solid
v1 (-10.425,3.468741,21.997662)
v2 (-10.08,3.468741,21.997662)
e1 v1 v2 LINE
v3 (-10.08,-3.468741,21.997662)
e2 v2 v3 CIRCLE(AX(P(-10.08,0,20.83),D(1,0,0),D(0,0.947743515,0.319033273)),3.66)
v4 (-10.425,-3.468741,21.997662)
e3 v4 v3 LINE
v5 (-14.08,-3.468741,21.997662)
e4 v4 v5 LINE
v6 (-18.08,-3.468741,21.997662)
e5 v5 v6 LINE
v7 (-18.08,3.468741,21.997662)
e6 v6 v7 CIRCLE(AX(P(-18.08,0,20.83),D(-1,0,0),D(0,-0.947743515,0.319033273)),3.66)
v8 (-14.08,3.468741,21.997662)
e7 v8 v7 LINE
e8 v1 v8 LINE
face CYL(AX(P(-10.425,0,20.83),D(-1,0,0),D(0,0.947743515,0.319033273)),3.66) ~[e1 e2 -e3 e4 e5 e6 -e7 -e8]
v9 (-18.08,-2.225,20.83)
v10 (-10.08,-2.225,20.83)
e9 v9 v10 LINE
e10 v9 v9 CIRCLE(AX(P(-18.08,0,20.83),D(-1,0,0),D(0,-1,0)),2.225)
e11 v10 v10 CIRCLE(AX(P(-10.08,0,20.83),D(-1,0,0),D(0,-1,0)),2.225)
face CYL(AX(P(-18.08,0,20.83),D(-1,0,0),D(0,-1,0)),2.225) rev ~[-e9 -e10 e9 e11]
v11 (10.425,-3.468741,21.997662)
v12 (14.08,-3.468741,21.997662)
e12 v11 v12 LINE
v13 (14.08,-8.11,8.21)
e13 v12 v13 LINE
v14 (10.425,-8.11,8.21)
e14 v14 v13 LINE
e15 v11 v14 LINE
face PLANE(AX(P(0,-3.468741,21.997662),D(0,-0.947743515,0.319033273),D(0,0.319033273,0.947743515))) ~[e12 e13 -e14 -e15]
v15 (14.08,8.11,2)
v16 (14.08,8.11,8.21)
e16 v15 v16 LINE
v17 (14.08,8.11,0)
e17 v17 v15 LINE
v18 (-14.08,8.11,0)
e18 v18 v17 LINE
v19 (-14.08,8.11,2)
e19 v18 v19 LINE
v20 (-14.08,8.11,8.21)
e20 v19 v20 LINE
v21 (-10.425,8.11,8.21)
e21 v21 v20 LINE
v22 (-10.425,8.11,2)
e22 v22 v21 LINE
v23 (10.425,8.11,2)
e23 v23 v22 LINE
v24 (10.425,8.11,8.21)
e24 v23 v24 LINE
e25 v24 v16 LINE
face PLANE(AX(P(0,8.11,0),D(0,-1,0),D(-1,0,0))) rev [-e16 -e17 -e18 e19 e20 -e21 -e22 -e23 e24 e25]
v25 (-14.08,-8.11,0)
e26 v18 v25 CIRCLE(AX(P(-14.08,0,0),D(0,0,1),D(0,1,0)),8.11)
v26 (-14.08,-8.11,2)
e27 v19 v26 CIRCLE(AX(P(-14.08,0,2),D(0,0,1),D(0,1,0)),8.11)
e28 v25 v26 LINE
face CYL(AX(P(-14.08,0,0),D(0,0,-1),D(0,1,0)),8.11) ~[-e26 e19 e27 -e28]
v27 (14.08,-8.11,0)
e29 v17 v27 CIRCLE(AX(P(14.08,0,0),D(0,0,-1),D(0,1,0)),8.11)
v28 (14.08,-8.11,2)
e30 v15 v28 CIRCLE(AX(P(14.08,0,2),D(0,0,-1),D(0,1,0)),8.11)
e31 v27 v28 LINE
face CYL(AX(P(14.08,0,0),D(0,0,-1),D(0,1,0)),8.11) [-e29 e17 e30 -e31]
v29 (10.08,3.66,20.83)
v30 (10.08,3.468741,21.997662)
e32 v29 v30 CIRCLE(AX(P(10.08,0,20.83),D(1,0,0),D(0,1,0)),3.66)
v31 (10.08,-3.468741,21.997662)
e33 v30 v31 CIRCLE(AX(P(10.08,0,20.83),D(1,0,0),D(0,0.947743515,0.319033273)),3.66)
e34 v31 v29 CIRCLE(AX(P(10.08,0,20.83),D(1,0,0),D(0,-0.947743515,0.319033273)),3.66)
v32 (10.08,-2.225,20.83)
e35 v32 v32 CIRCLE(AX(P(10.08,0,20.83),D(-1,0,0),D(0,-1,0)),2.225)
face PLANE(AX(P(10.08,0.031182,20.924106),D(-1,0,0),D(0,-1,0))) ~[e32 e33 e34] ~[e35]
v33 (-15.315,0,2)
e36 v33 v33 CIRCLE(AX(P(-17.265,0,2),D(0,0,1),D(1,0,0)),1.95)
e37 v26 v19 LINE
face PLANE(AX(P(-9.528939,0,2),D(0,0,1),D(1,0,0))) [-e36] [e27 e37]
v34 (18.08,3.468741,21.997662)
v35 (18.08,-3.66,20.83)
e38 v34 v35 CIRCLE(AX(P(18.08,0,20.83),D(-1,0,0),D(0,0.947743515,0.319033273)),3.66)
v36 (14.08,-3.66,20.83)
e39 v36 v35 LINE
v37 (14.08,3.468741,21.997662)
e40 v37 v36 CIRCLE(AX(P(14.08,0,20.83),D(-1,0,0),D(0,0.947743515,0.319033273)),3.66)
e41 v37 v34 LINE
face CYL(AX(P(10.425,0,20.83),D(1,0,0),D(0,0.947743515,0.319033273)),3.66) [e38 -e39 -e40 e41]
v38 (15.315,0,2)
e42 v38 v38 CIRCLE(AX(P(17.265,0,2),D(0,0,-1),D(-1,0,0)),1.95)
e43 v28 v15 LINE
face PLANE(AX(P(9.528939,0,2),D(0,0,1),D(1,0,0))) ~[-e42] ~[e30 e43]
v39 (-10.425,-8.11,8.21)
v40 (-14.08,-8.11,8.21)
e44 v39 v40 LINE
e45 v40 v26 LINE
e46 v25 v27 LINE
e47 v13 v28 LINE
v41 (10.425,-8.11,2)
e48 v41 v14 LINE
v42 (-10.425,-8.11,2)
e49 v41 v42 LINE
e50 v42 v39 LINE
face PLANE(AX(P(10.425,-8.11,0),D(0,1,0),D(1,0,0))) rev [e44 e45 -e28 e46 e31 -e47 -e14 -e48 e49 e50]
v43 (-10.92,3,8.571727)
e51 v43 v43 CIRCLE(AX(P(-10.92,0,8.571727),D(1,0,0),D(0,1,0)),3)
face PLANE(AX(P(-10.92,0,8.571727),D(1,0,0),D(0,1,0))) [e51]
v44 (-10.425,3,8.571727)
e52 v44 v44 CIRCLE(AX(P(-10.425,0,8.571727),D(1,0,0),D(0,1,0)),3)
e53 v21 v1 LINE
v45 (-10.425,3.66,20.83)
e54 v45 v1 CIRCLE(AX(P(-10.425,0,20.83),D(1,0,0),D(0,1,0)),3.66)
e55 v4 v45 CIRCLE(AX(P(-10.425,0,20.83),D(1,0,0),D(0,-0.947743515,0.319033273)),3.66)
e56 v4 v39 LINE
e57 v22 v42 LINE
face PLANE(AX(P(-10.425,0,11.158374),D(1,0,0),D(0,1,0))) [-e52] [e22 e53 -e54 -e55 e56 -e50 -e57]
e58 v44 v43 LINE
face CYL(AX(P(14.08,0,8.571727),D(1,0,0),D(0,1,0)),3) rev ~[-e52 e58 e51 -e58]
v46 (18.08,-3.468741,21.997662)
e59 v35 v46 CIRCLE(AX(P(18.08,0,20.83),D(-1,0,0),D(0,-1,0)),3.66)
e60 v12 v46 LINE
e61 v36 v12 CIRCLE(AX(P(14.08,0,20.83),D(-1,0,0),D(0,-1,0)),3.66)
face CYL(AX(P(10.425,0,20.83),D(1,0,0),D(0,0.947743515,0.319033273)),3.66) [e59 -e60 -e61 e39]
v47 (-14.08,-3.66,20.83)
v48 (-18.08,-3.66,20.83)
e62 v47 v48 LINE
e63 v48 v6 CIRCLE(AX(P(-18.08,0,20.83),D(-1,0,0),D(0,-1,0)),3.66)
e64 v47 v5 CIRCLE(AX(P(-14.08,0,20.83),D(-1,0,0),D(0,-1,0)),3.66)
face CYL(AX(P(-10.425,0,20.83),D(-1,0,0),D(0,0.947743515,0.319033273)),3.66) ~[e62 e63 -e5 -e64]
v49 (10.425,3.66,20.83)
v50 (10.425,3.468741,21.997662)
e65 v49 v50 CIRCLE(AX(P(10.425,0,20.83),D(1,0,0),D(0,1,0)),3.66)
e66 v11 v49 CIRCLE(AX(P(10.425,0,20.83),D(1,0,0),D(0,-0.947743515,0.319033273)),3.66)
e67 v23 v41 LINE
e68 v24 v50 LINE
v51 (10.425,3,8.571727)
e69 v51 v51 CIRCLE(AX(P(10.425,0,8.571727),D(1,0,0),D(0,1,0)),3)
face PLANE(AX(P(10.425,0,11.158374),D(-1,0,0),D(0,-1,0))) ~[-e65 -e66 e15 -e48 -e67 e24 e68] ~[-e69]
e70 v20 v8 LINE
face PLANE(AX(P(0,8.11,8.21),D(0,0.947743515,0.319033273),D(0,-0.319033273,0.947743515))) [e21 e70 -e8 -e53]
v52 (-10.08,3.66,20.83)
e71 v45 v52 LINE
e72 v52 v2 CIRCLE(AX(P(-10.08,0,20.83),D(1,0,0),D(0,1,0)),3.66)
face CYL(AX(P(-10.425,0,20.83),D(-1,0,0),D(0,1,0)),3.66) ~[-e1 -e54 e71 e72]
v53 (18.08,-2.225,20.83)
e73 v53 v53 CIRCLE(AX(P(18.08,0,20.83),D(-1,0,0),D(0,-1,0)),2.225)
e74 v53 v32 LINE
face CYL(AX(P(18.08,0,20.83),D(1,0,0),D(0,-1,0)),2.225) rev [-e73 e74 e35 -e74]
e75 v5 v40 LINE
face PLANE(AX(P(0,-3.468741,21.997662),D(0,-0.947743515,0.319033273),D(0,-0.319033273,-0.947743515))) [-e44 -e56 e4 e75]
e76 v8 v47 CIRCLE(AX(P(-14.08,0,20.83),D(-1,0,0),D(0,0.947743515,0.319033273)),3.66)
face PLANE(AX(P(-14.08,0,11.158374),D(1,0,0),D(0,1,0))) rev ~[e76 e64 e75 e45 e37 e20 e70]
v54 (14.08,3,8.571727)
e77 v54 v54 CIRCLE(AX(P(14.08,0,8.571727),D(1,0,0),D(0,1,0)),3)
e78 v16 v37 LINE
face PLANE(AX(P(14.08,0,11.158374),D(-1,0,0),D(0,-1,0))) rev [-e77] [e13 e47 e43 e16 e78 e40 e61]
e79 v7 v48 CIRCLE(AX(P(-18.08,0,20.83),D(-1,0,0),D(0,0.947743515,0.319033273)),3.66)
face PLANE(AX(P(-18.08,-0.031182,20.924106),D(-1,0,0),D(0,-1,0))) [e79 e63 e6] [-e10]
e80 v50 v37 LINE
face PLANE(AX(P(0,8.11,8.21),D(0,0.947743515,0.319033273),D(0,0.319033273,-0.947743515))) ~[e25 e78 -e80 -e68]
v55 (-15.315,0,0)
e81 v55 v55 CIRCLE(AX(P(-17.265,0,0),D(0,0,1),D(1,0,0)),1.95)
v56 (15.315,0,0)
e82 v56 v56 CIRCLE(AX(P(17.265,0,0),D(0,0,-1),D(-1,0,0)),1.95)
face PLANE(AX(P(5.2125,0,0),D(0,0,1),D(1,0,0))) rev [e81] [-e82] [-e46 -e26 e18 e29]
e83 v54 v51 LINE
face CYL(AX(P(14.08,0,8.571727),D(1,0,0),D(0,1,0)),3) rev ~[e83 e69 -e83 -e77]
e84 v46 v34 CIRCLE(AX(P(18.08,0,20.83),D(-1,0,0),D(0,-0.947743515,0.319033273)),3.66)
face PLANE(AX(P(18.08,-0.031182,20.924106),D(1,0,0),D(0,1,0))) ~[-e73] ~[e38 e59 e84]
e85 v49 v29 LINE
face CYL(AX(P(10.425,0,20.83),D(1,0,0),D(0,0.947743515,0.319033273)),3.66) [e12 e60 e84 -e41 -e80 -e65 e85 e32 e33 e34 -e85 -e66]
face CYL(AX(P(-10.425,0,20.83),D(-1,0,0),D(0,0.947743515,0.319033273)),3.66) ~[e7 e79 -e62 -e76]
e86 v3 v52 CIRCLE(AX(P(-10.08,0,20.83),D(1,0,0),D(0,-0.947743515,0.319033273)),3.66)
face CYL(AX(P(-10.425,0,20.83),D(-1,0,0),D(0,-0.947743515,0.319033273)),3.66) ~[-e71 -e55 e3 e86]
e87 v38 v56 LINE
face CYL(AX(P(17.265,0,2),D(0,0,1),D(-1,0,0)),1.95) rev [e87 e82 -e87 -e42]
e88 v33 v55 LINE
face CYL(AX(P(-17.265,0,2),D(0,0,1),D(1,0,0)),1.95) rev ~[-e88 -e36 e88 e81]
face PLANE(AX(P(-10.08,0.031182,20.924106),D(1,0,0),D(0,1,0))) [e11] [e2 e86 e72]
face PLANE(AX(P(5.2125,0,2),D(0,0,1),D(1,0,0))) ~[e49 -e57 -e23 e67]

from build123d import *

# Parameters (mm, degrees)
F1_DEPTH  = 2
F3_DEPTH  = 14.08
F4_DEPTH  = 10.425
F6_DEPTH  = 4
F8_DEPTH  = 0.345
F9_R      = 2.225
F10_DEPTH = 8
F11_R     = 1.95
F12_DEPTH = 2
F14_DEPTH = 2
F16_R     = 3
F17_DEPTH = 25


with BuildPart() as f1:
    # F0 (on Top) → F1 (new body)
    with BuildSketch(Plane.XY):
        with BuildLine():
            Line((-14.08, -8.11), (0, -8.11))
            Line((0, -8.11), (0, 0))
            Line((0, 0), (0, 8.11))
            Line((0, 8.11), (-14.08, 8.11))
            ThreePointArc((-14.08, 8.11), (-22.19, 0), (-14.08, -8.11))
        make_face()
    extrude(amount=F1_DEPTH)

    # F2 (on Right) → F3 (join)
    with BuildSketch(Plane.YZ):
        with BuildLine():
            Line((-8.11, 8.21), (-8.11, 2))
            Line((-8.11, 2), (8.11, 2))
            Line((8.11, 2), (8.11, 8.21))
            Line((8.11, 8.21), (3.4687412656, 21.99766178))
            ThreePointArc((3.4687412656, 21.99766178), (0, 24.49), (-3.4687412656, 21.99766178))
            Line((-3.4687412656, 21.99766178), (-8.11, 8.21))
        make_face()
    extrude(amount=-F3_DEPTH)

    # F4 (cut): a face of the model
    f4_faces = [f1.faces().sort_by_distance(p)[0] for p in [
        (0, 0, 10.1553909867),
    ]]
    extrude(f4_faces, amount=-F4_DEPTH, mode=Mode.SUBTRACT)

    # F5 (on face) → F6 (join)
    with BuildSketch(Plane(origin=(-14.08, 0, 0), x_dir=(0, -1, 0), z_dir=(-1, 0, 0))):
        with BuildLine():
            ThreePointArc((-3.4687412656, 21.99766178), (-0.5916109228, 17.2181311602), (3.66, 20.83))
            ThreePointArc((3.66, 20.83), (3.6118688398, 21.4216109228), (3.4687412656, 21.99766178))
            ThreePointArc((3.4687412656, 21.99766178), (0, 24.49), (-3.4687412656, 21.99766178))
        make_face()
    extrude(amount=F6_DEPTH)

    # F7 (on face) → F8 (join)
    with BuildSketch(Plane.YZ.offset(-10.425)):
        with BuildLine():
            ThreePointArc((-3.4687412656, 21.99766178), (-0.5916109228, 17.2181311602), (3.66, 20.83))
            ThreePointArc((3.66, 20.83), (3.6118688398, 21.4216109228), (3.4687412656, 21.99766178))
            ThreePointArc((3.4687412656, 21.99766178), (0, 24.49), (-3.4687412656, 21.99766178))
        make_face()
    extrude(amount=F8_DEPTH)

    # F9 (on face) → F10 (cut)
    with BuildSketch(Plane(origin=(-18.08, 0, 0), x_dir=(0, -1, 0), z_dir=(-1, 0, 0))):
        with Locations((0, 20.83)):
            Circle(F9_R)
    extrude(amount=-F10_DEPTH, mode=Mode.SUBTRACT)

    # F11 (on face) → F12 (cut)
    with BuildSketch(Plane.XY.offset(2)):
        with Locations((-17.265, 0)):
            Circle(F11_R)
    extrude(amount=-F12_DEPTH, mode=Mode.SUBTRACT)

    # F13 (on face) → F14 (join)
    with BuildSketch(Plane.XY):
        Polygon((-10.425, 8.11), (-10.425, -8.11), (0, -8.11), (0, 0), (0, 8.11), align=None)
    extrude(amount=F14_DEPTH)

    # F15: F1 across plane


with BuildPart() as f1_1:
    add(f1.part)
    add(f1.part.mirror(Plane.YZ))

    # F16 (on face) → F17 (cut)
    with BuildSketch(Plane.YZ.offset(14.08)):
        with Locations((0, 8.5717271108)):
            Circle(F16_R)
    extrude(amount=-F17_DEPTH, mode=Mode.SUBTRACT)


solid = f1_1.part
